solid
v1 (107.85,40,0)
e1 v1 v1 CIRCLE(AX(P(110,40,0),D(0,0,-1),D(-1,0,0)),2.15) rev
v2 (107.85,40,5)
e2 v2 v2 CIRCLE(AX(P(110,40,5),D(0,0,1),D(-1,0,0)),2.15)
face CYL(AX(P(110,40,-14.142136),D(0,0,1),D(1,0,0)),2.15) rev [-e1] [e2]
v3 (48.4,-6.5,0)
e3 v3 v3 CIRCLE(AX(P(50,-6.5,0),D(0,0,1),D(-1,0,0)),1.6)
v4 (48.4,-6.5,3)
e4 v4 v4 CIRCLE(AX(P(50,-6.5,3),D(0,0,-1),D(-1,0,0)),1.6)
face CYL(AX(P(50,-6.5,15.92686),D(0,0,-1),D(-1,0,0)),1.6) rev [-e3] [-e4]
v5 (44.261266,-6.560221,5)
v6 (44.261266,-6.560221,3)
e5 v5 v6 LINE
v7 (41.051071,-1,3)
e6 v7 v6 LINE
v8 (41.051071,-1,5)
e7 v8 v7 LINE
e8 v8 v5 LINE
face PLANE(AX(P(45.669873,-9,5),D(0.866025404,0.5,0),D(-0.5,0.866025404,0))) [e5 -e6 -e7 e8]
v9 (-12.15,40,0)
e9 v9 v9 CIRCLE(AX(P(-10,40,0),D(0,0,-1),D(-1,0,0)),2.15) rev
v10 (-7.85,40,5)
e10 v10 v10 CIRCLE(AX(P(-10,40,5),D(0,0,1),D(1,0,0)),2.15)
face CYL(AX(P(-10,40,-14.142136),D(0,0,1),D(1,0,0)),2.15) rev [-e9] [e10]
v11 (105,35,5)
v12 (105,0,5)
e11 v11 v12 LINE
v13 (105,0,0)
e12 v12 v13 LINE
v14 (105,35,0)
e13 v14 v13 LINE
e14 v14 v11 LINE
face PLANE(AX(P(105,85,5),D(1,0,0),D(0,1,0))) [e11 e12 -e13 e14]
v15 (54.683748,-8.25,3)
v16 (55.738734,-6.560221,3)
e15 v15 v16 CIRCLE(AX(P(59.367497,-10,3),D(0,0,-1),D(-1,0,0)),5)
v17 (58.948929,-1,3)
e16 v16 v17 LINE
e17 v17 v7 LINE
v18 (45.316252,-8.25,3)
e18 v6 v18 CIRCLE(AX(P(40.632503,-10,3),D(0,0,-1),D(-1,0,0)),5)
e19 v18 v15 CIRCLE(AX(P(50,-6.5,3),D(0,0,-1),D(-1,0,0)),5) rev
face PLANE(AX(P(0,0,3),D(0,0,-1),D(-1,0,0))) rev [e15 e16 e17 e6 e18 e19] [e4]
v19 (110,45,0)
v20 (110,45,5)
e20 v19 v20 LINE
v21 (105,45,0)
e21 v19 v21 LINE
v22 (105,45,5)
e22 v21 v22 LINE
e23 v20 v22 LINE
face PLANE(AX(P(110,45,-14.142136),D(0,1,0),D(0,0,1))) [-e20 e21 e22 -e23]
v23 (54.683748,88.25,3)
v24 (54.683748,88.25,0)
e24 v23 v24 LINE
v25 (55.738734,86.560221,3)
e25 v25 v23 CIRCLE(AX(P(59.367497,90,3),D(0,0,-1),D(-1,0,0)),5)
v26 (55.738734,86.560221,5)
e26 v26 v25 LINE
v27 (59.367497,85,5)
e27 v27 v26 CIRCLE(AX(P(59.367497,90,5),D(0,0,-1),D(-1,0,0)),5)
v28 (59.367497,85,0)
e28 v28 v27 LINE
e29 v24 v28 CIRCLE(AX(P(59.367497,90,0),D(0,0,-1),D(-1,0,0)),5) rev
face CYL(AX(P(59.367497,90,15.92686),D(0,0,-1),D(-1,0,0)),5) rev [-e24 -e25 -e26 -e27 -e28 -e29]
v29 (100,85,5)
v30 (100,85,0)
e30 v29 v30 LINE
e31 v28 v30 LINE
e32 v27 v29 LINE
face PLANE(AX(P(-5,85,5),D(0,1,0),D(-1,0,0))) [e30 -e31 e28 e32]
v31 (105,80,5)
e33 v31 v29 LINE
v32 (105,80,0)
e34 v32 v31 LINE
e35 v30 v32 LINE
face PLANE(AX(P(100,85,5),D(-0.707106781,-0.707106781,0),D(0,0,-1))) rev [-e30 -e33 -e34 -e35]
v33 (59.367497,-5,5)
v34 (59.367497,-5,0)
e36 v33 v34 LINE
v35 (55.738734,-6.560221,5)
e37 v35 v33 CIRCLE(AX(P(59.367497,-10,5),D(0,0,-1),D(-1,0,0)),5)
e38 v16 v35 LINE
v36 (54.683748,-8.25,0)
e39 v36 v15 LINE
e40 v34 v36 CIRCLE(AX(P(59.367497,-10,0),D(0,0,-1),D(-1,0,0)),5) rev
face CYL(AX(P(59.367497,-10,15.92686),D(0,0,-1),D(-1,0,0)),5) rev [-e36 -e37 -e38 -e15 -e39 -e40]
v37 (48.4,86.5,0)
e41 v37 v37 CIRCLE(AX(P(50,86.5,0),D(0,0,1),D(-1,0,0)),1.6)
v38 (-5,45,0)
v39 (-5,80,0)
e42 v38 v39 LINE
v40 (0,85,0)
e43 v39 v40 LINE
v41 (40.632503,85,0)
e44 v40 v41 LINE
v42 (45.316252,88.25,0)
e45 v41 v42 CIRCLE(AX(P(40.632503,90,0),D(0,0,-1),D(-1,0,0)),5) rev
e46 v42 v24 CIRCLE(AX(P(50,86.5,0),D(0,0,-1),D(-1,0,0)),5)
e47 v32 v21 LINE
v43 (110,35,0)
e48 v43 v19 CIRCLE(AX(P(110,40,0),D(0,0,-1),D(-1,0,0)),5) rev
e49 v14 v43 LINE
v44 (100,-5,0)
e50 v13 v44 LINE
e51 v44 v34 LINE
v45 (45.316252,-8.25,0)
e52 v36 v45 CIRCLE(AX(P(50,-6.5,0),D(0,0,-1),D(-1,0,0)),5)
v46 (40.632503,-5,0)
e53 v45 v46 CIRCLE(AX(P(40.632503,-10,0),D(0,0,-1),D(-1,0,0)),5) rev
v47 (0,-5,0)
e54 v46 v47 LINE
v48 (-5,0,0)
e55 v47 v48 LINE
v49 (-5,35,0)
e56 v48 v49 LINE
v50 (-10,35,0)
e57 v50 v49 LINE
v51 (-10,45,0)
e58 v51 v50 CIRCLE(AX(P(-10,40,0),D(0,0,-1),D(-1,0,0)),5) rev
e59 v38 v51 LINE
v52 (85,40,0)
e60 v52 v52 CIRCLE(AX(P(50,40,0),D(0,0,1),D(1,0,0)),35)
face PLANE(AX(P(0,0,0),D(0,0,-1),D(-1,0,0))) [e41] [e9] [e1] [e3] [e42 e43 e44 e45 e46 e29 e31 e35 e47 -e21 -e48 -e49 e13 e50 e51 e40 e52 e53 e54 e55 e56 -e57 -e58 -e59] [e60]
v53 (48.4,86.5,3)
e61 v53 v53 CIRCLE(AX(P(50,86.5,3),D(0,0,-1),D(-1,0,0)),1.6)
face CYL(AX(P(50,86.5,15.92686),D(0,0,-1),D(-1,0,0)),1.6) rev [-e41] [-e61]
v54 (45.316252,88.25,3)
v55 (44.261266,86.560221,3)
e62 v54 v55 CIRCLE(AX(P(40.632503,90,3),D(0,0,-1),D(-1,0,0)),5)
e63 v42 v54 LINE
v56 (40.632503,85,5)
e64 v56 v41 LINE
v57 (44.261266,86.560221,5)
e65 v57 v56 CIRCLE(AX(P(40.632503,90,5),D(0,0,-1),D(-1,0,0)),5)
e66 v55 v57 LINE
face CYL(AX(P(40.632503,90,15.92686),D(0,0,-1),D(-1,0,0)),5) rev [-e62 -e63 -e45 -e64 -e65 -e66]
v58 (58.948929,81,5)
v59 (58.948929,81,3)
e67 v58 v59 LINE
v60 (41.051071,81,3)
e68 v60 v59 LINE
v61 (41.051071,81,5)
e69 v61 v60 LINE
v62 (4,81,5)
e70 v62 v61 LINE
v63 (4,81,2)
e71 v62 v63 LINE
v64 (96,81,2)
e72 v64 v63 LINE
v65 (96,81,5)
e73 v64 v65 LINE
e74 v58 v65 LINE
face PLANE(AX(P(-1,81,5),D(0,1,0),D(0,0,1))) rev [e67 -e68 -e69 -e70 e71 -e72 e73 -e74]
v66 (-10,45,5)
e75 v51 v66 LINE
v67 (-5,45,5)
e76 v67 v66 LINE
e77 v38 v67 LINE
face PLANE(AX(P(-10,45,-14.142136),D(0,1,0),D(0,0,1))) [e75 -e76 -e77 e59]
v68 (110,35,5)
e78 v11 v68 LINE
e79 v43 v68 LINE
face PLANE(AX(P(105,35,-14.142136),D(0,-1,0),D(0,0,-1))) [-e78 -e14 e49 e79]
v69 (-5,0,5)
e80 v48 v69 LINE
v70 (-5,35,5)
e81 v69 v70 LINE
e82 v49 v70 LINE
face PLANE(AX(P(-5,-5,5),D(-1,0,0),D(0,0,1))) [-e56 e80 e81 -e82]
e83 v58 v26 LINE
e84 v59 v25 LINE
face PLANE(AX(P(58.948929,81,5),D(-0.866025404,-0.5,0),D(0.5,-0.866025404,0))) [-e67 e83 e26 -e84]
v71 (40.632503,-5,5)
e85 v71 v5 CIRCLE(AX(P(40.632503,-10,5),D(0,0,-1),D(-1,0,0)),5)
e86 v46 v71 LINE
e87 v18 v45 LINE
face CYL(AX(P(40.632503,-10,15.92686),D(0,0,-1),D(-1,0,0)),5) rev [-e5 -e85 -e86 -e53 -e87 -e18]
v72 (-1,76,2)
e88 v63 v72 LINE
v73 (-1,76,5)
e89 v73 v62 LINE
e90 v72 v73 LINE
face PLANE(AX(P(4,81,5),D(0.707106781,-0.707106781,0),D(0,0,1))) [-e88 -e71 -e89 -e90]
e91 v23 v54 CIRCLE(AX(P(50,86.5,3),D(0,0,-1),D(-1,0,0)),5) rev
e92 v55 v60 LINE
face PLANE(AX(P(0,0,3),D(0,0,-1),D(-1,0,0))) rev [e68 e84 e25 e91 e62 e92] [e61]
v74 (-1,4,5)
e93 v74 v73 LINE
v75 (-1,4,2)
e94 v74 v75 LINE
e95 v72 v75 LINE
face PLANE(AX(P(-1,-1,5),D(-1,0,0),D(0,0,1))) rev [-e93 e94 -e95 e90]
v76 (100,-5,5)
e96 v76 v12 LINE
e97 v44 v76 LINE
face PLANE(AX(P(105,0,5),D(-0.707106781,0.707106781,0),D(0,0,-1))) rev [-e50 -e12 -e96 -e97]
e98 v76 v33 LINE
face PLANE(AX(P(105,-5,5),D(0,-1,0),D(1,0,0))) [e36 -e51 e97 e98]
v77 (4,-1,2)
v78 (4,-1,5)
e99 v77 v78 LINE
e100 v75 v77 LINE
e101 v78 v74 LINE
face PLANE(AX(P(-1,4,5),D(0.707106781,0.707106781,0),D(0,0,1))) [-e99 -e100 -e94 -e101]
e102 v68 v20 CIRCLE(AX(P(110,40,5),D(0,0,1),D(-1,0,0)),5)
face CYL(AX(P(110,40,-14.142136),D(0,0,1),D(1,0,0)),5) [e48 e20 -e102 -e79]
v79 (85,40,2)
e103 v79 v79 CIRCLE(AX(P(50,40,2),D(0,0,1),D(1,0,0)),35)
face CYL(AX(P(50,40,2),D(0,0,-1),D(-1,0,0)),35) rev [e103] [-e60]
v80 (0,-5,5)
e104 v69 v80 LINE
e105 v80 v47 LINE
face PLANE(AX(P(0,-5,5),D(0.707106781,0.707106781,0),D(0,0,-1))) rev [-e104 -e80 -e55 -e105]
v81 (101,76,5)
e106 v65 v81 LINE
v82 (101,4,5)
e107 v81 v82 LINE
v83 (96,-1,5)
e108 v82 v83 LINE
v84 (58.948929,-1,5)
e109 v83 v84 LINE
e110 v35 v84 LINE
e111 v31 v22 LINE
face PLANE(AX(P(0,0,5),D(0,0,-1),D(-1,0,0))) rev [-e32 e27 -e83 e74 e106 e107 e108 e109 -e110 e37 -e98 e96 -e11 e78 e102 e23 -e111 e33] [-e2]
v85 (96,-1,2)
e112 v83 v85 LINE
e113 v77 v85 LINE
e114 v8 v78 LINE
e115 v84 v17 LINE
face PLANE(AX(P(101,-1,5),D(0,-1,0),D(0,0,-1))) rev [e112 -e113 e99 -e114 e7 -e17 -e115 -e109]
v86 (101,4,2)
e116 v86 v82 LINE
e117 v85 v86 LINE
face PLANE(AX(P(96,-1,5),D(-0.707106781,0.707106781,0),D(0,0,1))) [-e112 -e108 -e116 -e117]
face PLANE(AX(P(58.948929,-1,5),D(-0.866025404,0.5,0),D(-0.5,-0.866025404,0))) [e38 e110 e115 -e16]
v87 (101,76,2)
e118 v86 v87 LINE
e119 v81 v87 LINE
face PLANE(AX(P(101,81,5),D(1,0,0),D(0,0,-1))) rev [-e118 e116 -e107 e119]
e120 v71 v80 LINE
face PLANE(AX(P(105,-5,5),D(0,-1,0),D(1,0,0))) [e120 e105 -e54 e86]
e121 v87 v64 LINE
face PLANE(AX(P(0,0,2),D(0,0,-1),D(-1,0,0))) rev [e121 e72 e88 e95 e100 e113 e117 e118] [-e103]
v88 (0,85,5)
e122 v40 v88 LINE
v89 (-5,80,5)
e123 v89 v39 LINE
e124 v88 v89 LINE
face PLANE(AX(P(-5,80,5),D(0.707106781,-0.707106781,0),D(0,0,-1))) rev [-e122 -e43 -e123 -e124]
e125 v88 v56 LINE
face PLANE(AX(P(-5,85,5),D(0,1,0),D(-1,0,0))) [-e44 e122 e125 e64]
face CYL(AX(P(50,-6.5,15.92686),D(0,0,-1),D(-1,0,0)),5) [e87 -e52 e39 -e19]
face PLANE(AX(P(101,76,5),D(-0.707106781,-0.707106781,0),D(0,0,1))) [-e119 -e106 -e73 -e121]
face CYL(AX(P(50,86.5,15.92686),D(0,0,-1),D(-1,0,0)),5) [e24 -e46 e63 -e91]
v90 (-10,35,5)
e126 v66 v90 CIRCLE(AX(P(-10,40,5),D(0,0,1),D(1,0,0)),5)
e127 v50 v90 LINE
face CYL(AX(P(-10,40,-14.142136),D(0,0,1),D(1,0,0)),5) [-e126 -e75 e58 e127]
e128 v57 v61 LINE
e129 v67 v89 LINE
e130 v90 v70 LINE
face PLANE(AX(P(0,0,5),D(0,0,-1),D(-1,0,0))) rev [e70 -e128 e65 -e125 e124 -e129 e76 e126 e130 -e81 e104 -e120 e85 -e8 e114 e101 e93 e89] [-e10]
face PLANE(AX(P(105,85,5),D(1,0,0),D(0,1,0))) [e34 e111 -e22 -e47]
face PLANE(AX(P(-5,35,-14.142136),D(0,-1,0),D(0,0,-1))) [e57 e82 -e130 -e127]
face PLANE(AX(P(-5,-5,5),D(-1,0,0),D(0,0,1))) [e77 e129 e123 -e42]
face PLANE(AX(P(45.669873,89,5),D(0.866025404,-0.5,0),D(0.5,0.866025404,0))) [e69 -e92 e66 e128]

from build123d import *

# Parameters (mm, degrees)
SKETCH_1_W          = 102
SKETCH_1_H          = 82
SKETCH_1_R          = 35
EXTRUDE_1_DEPTH     = 2
SKETCH_2_W          = 110
SKETCH_2_H          = 90
SKETCH_2_W_2        = 102
SKETCH_2_H_2        = 82
EXTRUDE_2_DEPTH     = 5
EXTRUDE_3_DEPTH     = 3
CUT_EXTRUDE_1_DEPTH = 140.306317158
FILLET_1_R          = 5
SKETCH_5_R          = 2.15
EXTRUDE_4_DEPTH     = 5
CHAMFER_1_SIZE      = 5
SKETCH_6_R          = 1.6
CUT_EXTRUDE_2_DEPTH = 147.990645961


with BuildPart() as part:
    # 草图1 → 凸台-拉伸1 (new body)
    with BuildSketch(Plane.XY):
        with Locations((50, 40)):
            Rectangle(SKETCH_1_W, SKETCH_1_H)
        with Locations((50, 40)):
            Circle(SKETCH_1_R, mode=Mode.SUBTRACT)
    extrude(amount=EXTRUDE_1_DEPTH)

    # 草图2 → 凸台-拉伸2 (add)
    with BuildSketch(Plane(origin=(0, 0, 0), x_dir=(-1, 0, 0), z_dir=(0, 0, -1))):
        with Locations((-50, 40)):
            Rectangle(SKETCH_2_W, SKETCH_2_H)
        with Locations((-50, 40)):
            Rectangle(SKETCH_2_W_2, SKETCH_2_H_2, mode=Mode.SUBTRACT)
    extrude(amount=-EXTRUDE_2_DEPTH)

    # 草图3 → 凸台-拉伸3 (add)
    with BuildSketch(Plane(origin=(0, 0, 0), x_dir=(-1, 0, 0), z_dir=(0, 0, -1))):
        with BuildLine():
            Line((-55, 86.5), (-55, 85))
            Line((-55, 85), (-50.556776436, 85))
            ThreePointArc((-50.556776436, 85), (-50, 88.1), (-49.443223564, 85))
            Line((-49.443223564, 85), (-45, 85))
            Line((-45, 85), (-45, 86.5))
            ThreePointArc((-45, 86.5), (-50, 91.5), (-55, 86.5))
        make_face()
        with BuildLine():
            Line((-55, -6.5), (-55, -5))
            Line((-55, -5), (-50.556776436, -5))
            ThreePointArc((-50.556776436, -5), (-50, -8.1), (-49.443223564, -5))
            Line((-49.443223564, -5), (-45, -5))
            Line((-45, -5), (-45, -6.5))
            ThreePointArc((-45, -6.5), (-50, -11.5), (-55, -6.5))
        make_face()
    extrude(amount=-EXTRUDE_3_DEPTH)

    # 草图4 → 切除-拉伸1 (cut, through all)
    with BuildSketch(Plane.XY.offset(3)):
        with BuildLine():
            Line((45.669872981, 89), (41.051070828, 81))
            Line((41.051070828, 81), (58.948929172, 81))
            Line((58.948929172, 81), (54.330127019, 89))
            ThreePointArc((54.330127019, 89), (50, 91.5), (45.669872981, 89))
        make_face()
        with BuildLine():
            Line((58.948929172, -1), (54.330127019, -9))
            ThreePointArc((54.330127019, -9), (50, -11.5), (45.669872981, -9))
            Line((45.669872981, -9), (41.051070828, -1))
            Line((41.051070828, -1), (58.948929172, -1))
        make_face()
    extrude(amount=CUT_EXTRUDE_1_DEPTH, mode=Mode.SUBTRACT)

    # 圆角1
    # the kernel refuses this fillet: 5 mm, written as the material it adds along each edge
    with BuildSketch(Plane(origin=(55, -5, 0), x_dir=(-0.09685070087569839, -0.995298920797107, 0), z_dir=(0, 0, 1))) as fillet_1_piece_1_section:
        with BuildLine():
            CenterArc((4.553499459, 4.831218553), FILLET_1_R, 185.557848431, 69.512684885)
            Line((-0.422995145, 4.346965048), (-0.920644606, 4.298539698))
            Line((-0.920644606, 4.298539698), (-0.49764946, -0.04842535))
            Line((-0.49764946, -0.04842535), (0.04842535, -0.49764946))
            ThreePointArc((0.04842535, -0.49764946), (1.541373732, -0.352373409), (3.136535793, -0.483121855))
            Line((3.136535793, -0.483121855), (3.265350672, 0))
        make_face()
    fillet_1_piece_1 = extrude(amount=3, mode=Mode.PRIVATE)
    fillet_1_piece_1 = split(fillet_1_piece_1, bisect_by=Plane(origin=(55.914654271, -6.255518293, 1.5), z_dir=(-0.8660254037844367, 0.5000000000000034, 0)), keep=Keep.TOP, mode=Mode.PRIVATE)
    add(fillet_1_piece_1)
    with BuildSketch(Plane(origin=(55, -5, 0), x_dir=(-0.09685070087569839, -0.995298920797107, 0), z_dir=(0, 0, 1))) as fillet_1_piece_2_section:
        with BuildLine():
            CenterArc((4.553499459, 4.831218553), FILLET_1_R, 185.557848431, 69.512684885)
            Line((-0.422995145, 4.346965048), (-0.920644606, 4.298539698))
            Line((-0.920644606, 4.298539698), (-0.49764946, -0.04842535))
            Line((-0.49764946, -0.04842535), (0.04842535, -0.49764946))
            ThreePointArc((0.04842535, -0.49764946), (1.541373732, -0.352373409), (3.136535793, -0.483121855))
            Line((3.136535793, -0.483121855), (3.265350672, 0))
        make_face()
    fillet_1_piece_2 = extrude(amount=3, mode=Mode.PRIVATE)
    fillet_1_piece_2 = split(fillet_1_piece_2, bisect_by=Plane(origin=(56.857806143, -4.621931332, 1.5), z_dir=(0.8660254037844367, -0.5000000000000034, 0)), keep=Keep.TOP, mode=Mode.PRIVATE)
    add(fillet_1_piece_2)
    with BuildSketch(Plane(origin=(55, -5, 0), x_dir=(-0.09685070087569839, -0.995298920797107, 0), z_dir=(0, 0, 1))) as fillet_1_piece_3_section:
        with BuildLine():
            CenterArc((4.553499459, 4.831218553), FILLET_1_R, 185.557848431, 69.512684885)
            Line((-0.422995145, 4.346965048), (-0.920644606, 4.298539698))
            Line((-0.920644606, 4.298539698), (-0.49764946, -0.04842535))
            Line((-0.49764946, -0.04842535), (0.04842535, -0.49764946))
            ThreePointArc((0.04842535, -0.49764946), (1.541373732, -0.352373409), (3.136535793, -0.483121855))
            Line((3.136535793, -0.483121855), (3.265350672, 0))
        make_face()
    fillet_1_piece_3 = extrude(amount=13.918742494, mode=Mode.PRIVATE)
    fillet_1_piece_3 = split(fillet_1_piece_3, bisect_by=Plane(origin=(57.593647947, -5.046769796, 5), z_dir=(0, 0, -1)), keep=Keep.TOP, mode=Mode.PRIVATE)
    fillet_1_piece_3 = split(fillet_1_piece_3, bisect_by=Plane(origin=(56.857806143, -4.621931332, 4), z_dir=(0.8660254037844367, -0.5000000000000034, 0)), keep=Keep.TOP, mode=Mode.PRIVATE)
    fillet_1_piece_3 = split(fillet_1_piece_3, bisect_by=Plane(origin=(57.593647947, -5.046769796, 3), z_dir=(0, 0, 1)), keep=Keep.TOP, mode=Mode.PRIVATE)
    add(fillet_1_piece_3)
    with BuildSketch(Plane(origin=(45, -5, 0), x_dir=(0.09685070087569624, -0.9952989207971072, 0), z_dir=(0, 0, 1))) as fillet_1_piece_4_section:
        with BuildLine():
            CenterArc((4.553499459, -4.831218553), FILLET_1_R, 104.929466684, 69.512684885)
            Line((-0.422995145, -4.346965048), (-0.920644606, -4.298539698))
            Line((-0.920644606, -4.298539698), (-0.49764946, 0.04842535))
            Line((-0.49764946, 0.04842535), (0.04842535, 0.49764946))
            ThreePointArc((0.04842535, 0.49764946), (1.541373732, 0.352373409), (3.136535793, 0.483121855))
            Line((3.136535793, 0.483121855), (3.265350672, 0))
        make_face()
    fillet_1_piece_4 = extrude(amount=3, mode=Mode.PRIVATE)
    fillet_1_piece_4 = split(fillet_1_piece_4, bisect_by=Plane(origin=(44.085345729, -6.255518293, 1.5), z_dir=(0.8660254037844364, 0.5000000000000041, 0)), keep=Keep.TOP, mode=Mode.PRIVATE)
    add(fillet_1_piece_4)
    with BuildSketch(Plane(origin=(45, -5, 0), x_dir=(0.09685070087569624, -0.9952989207971072, 0), z_dir=(0, 0, 1))) as fillet_1_piece_5_section:
        with BuildLine():
            CenterArc((4.553499459, -4.831218553), FILLET_1_R, 104.929466684, 69.512684885)
            Line((-0.422995145, -4.346965048), (-0.920644606, -4.298539698))
            Line((-0.920644606, -4.298539698), (-0.49764946, 0.04842535))
            Line((-0.49764946, 0.04842535), (0.04842535, 0.49764946))
            ThreePointArc((0.04842535, 0.49764946), (1.541373732, 0.352373409), (3.136535793, 0.483121855))
            Line((3.136535793, 0.483121855), (3.265350672, 0))
        make_face()
    fillet_1_piece_5 = extrude(amount=3, mode=Mode.PRIVATE)
    fillet_1_piece_5 = split(fillet_1_piece_5, bisect_by=Plane(origin=(43.142193857, -4.621931332, 1.5), z_dir=(-0.8660254037844364, -0.5000000000000041, 0)), keep=Keep.TOP, mode=Mode.PRIVATE)
    add(fillet_1_piece_5)
    with BuildSketch(Plane(origin=(45, -5, 0), x_dir=(0.09685070087569624, -0.9952989207971072, 0), z_dir=(0, 0, 1))) as fillet_1_piece_6_section:
        with BuildLine():
            CenterArc((4.553499459, -4.831218553), FILLET_1_R, 104.929466684, 69.512684885)
            Line((-0.422995145, -4.346965048), (-0.920644606, -4.298539698))
            Line((-0.920644606, -4.298539698), (-0.49764946, 0.04842535))
            Line((-0.49764946, 0.04842535), (0.04842535, 0.49764946))
            ThreePointArc((0.04842535, 0.49764946), (1.541373732, 0.352373409), (3.136535793, 0.483121855))
            Line((3.136535793, 0.483121855), (3.265350672, 0))
        make_face()
    fillet_1_piece_6 = extrude(amount=13.918742494, mode=Mode.PRIVATE)
    fillet_1_piece_6 = split(fillet_1_piece_6, bisect_by=Plane(origin=(42.406352053, -5.046769796, 5), z_dir=(0, 0, -1)), keep=Keep.TOP, mode=Mode.PRIVATE)
    fillet_1_piece_6 = split(fillet_1_piece_6, bisect_by=Plane(origin=(42.406352053, -5.046769796, 3), z_dir=(0, 0, 1)), keep=Keep.TOP, mode=Mode.PRIVATE)
    fillet_1_piece_6 = split(fillet_1_piece_6, bisect_by=Plane(origin=(43.142193857, -4.621931332, 4), z_dir=(-0.8660254037844364, -0.5000000000000041, 0)), keep=Keep.TOP, mode=Mode.PRIVATE)
    add(fillet_1_piece_6)
    with BuildSketch(Plane(origin=(55, 85, 0), x_dir=(-0.0968507008756942, 0.9952989207971075, 0), z_dir=(0, 0, 1))) as fillet_1_piece_7_section:
        with BuildLine():
            CenterArc((4.553499459, -4.831218553), FILLET_1_R, 104.929466684, 69.512684885)
            Line((-0.422995145, -4.346965048), (-0.920644606, -4.298539698))
            Line((-0.920644606, -4.298539698), (-0.49764946, 0.04842535))
            Line((-0.49764946, 0.04842535), (0.04842535, 0.49764946))
            ThreePointArc((0.04842535, 0.49764946), (1.541373732, 0.352373409), (3.136535793, 0.483121855))
            Line((3.136535793, 0.483121855), (3.265350672, 0))
        make_face()
    fillet_1_piece_7 = extrude(amount=3, mode=Mode.PRIVATE)
    fillet_1_piece_7 = split(fillet_1_piece_7, bisect_by=Plane(origin=(55.914654271, 86.255518293, 1.5), z_dir=(-0.8660254037844369, -0.5000000000000031, 0)), keep=Keep.TOP, mode=Mode.PRIVATE)
    add(fillet_1_piece_7)
    with BuildSketch(Plane(origin=(55, 85, 0), x_dir=(-0.0968507008756942, 0.9952989207971075, 0), z_dir=(0, 0, 1))) as fillet_1_piece_8_section:
        with BuildLine():
            CenterArc((4.553499459, -4.831218553), FILLET_1_R, 104.929466684, 69.512684885)
            Line((-0.422995145, -4.346965048), (-0.920644606, -4.298539698))
            Line((-0.920644606, -4.298539698), (-0.49764946, 0.04842535))
            Line((-0.49764946, 0.04842535), (0.04842535, 0.49764946))
            ThreePointArc((0.04842535, 0.49764946), (1.541373732, 0.352373409), (3.136535793, 0.483121855))
            Line((3.136535793, 0.483121855), (3.265350672, 0))
        make_face()
    fillet_1_piece_8 = extrude(amount=3, mode=Mode.PRIVATE)
    fillet_1_piece_8 = split(fillet_1_piece_8, bisect_by=Plane(origin=(56.857806143, 84.621931332, 1.5), z_dir=(0.8660254037844369, 0.5000000000000031, 0)), keep=Keep.TOP, mode=Mode.PRIVATE)
    add(fillet_1_piece_8)
    with BuildSketch(Plane(origin=(55, 85, 0), x_dir=(-0.0968507008756942, 0.9952989207971075, 0), z_dir=(0, 0, 1))) as fillet_1_piece_9_section:
        with BuildLine():
            CenterArc((4.553499459, -4.831218553), FILLET_1_R, 104.929466684, 69.512684885)
            Line((-0.422995145, -4.346965048), (-0.920644606, -4.298539698))
            Line((-0.920644606, -4.298539698), (-0.49764946, 0.04842535))
            Line((-0.49764946, 0.04842535), (0.04842535, 0.49764946))
            ThreePointArc((0.04842535, 0.49764946), (1.541373732, 0.352373409), (3.136535793, 0.483121855))
            Line((3.136535793, 0.483121855), (3.265350672, 0))
        make_face()
    fillet_1_piece_9 = extrude(amount=13.918742494, mode=Mode.PRIVATE)
    fillet_1_piece_9 = split(fillet_1_piece_9, bisect_by=Plane(origin=(57.593647947, 85.046769796, 3), z_dir=(0, 0, 1)), keep=Keep.TOP, mode=Mode.PRIVATE)
    fillet_1_piece_9 = split(fillet_1_piece_9, bisect_by=Plane(origin=(56.857806143, 84.621931332, 4), z_dir=(0.8660254037844369, 0.5000000000000031, 0)), keep=Keep.TOP, mode=Mode.PRIVATE)
    fillet_1_piece_9 = split(fillet_1_piece_9, bisect_by=Plane(origin=(57.593647947, 85.046769796, 5), z_dir=(0, 0, -1)), keep=Keep.TOP, mode=Mode.PRIVATE)
    add(fillet_1_piece_9)
    with BuildSketch(Plane(origin=(45, 85, 0), x_dir=(-1, 0, 0), z_dir=(0, 0, 1))) as fillet_1_piece_10_section:
        with BuildLine():
            CenterArc((4.367496998, -5), FILLET_1_R, 90, 69.512684885)
            Line((-0.316251501, -3.25), (-0.784626351, -3.075))
            ThreePointArc((-0.784626351, -3.075), (-0.5, -1.5), (-0.5, 0))
            Line((-0.5, 0), (0, 0.5))
            Line((0, 0.5), (4.367496998, 0.5))
            Line((4.367496998, 0.5), (4.367496998, 0))
        make_face()
    fillet_1_piece_10 = extrude(amount=3, mode=Mode.PRIVATE)
    fillet_1_piece_10 = split(fillet_1_piece_10, bisect_by=Plane(origin=(43.142193857, 84.621931332, 1.5), z_dir=(-0.8660254037844366, 0.5000000000000037, 0)), keep=Keep.TOP, mode=Mode.PRIVATE)
    add(fillet_1_piece_10)
    with BuildSketch(Plane(origin=(45, 85, 0), x_dir=(-1, 0, 0), z_dir=(0, 0, 1))) as fillet_1_piece_11_section:
        with BuildLine():
            CenterArc((4.367496998, -5), FILLET_1_R, 90, 69.512684885)
            Line((-0.316251501, -3.25), (-0.784626351, -3.075))
            ThreePointArc((-0.784626351, -3.075), (-0.5, -1.5), (-0.5, 0))
            Line((-0.5, 0), (0, 0.5))
            Line((0, 0.5), (4.367496998, 0.5))
            Line((4.367496998, 0.5), (4.367496998, 0))
        make_face()
    fillet_1_piece_11 = extrude(amount=3, mode=Mode.PRIVATE)
    fillet_1_piece_11 = split(fillet_1_piece_11, bisect_by=Plane(origin=(44.085345729, 86.255518293, 1.5), z_dir=(0.8660254037844366, -0.5000000000000037, 0)), keep=Keep.TOP, mode=Mode.PRIVATE)
    add(fillet_1_piece_11)
    with BuildSketch(Plane(origin=(45, 85, 0), x_dir=(-1, 0, 0), z_dir=(0, 0, 1))) as fillet_1_piece_12_section:
        with BuildLine():
            CenterArc((4.367496998, -5), FILLET_1_R, 90, 69.512684885)
            Line((-0.316251501, -3.25), (-0.784626351, -3.075))
            ThreePointArc((-0.784626351, -3.075), (-0.5, -1.5), (-0.5, 0))
            Line((-0.5, 0), (0, 0.5))
            Line((0, 0.5), (4.367496998, 0.5))
            Line((4.367496998, 0.5), (4.367496998, 0))
        make_face()
    fillet_1_piece_12 = extrude(amount=13.918742494, mode=Mode.PRIVATE)
    fillet_1_piece_12 = split(fillet_1_piece_12, bisect_by=Plane(origin=(42.406352053, 85.046769796, 5), z_dir=(0, 0, -1)), keep=Keep.TOP, mode=Mode.PRIVATE)
    fillet_1_piece_12 = split(fillet_1_piece_12, bisect_by=Plane(origin=(42.406352053, 85.046769796, 3), z_dir=(0, 0, 1)), keep=Keep.TOP, mode=Mode.PRIVATE)
    fillet_1_piece_12 = split(fillet_1_piece_12, bisect_by=Plane(origin=(43.142193857, 84.621931332, 4), z_dir=(-0.8660254037844366, 0.5000000000000037, 0)), keep=Keep.TOP, mode=Mode.PRIVATE)
    add(fillet_1_piece_12)

    # 草图5 → 凸台-拉伸4 (add)
    # profile 1 of 2: a face of its own
    with BuildSketch(Plane.XY.offset(5)):
        with BuildLine():
            Line((-10, 45), (-5, 45))
            Line((-5, 45), (-5, 35))
            Line((-5, 35), (-10, 35))
            ThreePointArc((-10, 35), (-15, 40), (-10, 45))
        make_face()
        with Locations((-10, 40)):
            Circle(SKETCH_5_R, mode=Mode.SUBTRACT)
    # profile 2 of 2: a face of its own
    with BuildSketch(Plane.XY.offset(5)):
        with BuildLine():
            Line((105, 35), (110, 35))
            ThreePointArc((110, 35), (115, 40), (110, 45))
            Line((110, 45), (105, 45))
            Line((105, 45), (105, 35))
        make_face()
        with Locations(Location((110, 40, 0), (0, 0, 180))):
            Circle(SKETCH_5_R, mode=Mode.SUBTRACT)
    extrude(amount=-EXTRUDE_4_DEPTH)

    # 倒角1
    chamfer_1_edges = [part.edges().sort_by_distance(p)[0] for p in [
        (101, -1, 3.5),
        (-1, 81, 3.5),
        (101, 81, 3.5),
        (-1, -1, 3.5),
        (-5, -5, 2.5),
        (105, -5, 2.5),
        (105, 85, 2.5),
        (-5, 85, 2.5),
    ]]
    chamfer(chamfer_1_edges, length=CHAMFER_1_SIZE)

    # 草图6 → 切除-拉伸2 (cut, through all)
    with BuildSketch(Plane.XY.offset(3)):
        with Locations(Location((50, 86.5, 0), (0, 0, 180))):
            Circle(SKETCH_6_R)
        with Locations(Location((50, -6.5, 0), (0, 0, 180))):
            Circle(SKETCH_6_R)
    extrude(amount=-CUT_EXTRUDE_2_DEPTH, mode=Mode.SUBTRACT)


solid = part.part
